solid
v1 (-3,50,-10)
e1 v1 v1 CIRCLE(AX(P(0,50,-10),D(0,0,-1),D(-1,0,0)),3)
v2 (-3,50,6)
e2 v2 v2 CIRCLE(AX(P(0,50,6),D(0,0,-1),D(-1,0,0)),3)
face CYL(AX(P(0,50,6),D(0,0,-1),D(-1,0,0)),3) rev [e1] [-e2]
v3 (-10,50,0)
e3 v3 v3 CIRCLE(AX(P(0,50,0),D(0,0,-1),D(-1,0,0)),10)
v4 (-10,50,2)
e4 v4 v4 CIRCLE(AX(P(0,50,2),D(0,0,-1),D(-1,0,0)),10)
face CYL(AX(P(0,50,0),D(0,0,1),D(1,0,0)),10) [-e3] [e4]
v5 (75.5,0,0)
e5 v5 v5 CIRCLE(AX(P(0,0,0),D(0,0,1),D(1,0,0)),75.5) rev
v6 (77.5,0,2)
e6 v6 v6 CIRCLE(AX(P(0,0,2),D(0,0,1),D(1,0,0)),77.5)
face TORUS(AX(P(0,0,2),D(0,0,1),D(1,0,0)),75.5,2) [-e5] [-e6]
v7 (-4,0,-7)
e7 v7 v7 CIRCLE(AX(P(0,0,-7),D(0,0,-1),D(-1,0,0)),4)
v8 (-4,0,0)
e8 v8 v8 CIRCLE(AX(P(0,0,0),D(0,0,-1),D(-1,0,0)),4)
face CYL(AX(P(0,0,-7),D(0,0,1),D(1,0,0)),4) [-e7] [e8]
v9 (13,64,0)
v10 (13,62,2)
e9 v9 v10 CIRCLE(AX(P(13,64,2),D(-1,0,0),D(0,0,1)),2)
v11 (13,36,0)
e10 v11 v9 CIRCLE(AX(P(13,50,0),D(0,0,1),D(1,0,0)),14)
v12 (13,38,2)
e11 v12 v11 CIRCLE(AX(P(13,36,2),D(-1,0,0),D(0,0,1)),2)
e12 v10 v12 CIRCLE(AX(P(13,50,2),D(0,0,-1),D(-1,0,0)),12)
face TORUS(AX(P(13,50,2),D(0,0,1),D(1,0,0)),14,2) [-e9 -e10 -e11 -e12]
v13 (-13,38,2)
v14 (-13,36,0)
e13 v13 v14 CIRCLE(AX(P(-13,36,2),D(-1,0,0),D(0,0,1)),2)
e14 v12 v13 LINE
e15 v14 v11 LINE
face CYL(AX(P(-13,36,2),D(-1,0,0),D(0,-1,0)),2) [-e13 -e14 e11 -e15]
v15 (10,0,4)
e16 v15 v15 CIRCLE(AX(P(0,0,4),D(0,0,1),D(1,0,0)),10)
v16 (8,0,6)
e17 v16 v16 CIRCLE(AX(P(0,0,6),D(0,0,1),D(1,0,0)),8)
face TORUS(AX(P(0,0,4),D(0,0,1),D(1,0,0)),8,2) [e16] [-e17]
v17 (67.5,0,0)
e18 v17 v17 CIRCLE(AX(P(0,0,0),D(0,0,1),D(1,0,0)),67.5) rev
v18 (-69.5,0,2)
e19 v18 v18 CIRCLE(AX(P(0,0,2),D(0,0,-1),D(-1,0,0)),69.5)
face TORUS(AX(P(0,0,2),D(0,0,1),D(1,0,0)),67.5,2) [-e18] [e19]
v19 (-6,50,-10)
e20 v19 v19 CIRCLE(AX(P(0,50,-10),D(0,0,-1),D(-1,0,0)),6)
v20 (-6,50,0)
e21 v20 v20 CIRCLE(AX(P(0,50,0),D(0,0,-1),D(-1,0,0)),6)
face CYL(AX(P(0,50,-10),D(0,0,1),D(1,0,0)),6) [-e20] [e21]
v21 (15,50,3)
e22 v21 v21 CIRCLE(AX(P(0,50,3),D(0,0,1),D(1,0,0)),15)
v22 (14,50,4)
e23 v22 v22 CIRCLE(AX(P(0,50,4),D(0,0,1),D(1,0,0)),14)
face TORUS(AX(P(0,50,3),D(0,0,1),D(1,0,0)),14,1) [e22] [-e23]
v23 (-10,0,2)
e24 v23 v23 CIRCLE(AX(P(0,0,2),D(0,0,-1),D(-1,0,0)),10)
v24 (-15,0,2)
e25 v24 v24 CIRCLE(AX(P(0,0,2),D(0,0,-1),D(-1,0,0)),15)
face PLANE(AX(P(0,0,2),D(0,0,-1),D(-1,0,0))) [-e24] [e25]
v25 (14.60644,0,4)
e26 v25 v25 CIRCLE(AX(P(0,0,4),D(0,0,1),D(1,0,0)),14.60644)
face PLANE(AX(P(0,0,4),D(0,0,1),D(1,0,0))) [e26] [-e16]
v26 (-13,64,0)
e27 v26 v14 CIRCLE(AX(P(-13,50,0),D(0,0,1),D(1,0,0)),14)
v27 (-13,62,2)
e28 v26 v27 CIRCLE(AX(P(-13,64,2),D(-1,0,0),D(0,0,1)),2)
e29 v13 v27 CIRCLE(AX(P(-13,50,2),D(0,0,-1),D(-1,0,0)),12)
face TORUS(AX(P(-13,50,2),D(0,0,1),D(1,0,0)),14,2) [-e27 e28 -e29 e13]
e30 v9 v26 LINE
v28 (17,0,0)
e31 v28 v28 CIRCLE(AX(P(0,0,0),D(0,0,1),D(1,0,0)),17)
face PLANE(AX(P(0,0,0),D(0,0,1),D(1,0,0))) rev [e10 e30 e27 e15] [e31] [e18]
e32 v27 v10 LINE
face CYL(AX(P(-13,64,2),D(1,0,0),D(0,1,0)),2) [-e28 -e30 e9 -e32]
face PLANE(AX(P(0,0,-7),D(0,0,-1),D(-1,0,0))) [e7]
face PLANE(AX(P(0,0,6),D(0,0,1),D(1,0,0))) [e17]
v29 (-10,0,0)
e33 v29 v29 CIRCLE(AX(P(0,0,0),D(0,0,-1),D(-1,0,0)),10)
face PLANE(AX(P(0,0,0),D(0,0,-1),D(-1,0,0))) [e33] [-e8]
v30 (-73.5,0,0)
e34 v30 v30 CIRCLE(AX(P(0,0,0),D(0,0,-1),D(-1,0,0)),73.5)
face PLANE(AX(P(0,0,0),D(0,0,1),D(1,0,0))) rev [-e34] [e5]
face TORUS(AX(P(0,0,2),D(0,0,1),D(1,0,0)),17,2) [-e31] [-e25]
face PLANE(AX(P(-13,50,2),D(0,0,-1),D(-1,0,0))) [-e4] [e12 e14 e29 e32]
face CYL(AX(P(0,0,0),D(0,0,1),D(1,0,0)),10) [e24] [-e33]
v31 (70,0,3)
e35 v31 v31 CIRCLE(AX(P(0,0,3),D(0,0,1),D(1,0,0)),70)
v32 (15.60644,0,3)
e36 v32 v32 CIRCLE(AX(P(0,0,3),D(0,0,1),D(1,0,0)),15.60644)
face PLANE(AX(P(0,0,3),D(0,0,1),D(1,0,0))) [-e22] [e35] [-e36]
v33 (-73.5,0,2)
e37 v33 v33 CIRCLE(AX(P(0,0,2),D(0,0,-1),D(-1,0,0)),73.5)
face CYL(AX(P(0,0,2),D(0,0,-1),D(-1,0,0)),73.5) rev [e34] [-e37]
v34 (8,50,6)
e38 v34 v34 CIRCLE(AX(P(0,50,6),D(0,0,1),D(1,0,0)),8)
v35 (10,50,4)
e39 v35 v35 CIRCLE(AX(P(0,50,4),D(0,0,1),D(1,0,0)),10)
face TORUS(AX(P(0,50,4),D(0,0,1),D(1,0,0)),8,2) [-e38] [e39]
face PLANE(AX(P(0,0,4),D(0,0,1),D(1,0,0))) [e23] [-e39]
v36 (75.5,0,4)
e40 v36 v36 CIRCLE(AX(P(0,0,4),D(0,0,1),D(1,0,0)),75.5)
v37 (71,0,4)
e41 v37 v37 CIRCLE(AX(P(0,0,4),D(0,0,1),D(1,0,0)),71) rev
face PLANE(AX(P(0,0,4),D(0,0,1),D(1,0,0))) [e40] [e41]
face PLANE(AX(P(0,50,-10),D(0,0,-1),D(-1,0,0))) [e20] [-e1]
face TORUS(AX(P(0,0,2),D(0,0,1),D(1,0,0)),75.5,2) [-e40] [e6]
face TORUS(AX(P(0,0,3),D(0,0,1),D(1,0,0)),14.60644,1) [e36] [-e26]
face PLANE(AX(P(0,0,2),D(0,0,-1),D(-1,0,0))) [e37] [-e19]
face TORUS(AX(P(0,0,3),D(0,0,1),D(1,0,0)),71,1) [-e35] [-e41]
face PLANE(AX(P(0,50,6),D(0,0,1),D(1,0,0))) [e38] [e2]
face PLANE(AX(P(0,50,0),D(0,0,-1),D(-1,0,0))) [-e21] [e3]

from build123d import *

# Parameters (mm, degrees)
SKETCH_3_R          = 77.5
EXTRUDE_1_DEPTH     = 4
FILLET_1_R          = 2
SKETCH_4_R          = 73.5
SKETCH_4_R_2        = 69.5
CUT_EXTRUDE_1_DEPTH = 2
FILLET_2_R          = 2
CUT_EXTRUDE_2_DEPTH = 2
SKETCH_7_R          = 10
EXTRUDE_2_DEPTH     = 2
SKETCH_8_R          = 6
EXTRUDE_3_DEPTH     = 10
EXTRUDE_START       = 2
SKETCH_9_R          = 10
EXTRUDE_4_DEPTH     = 2
SKETCH_10_R         = 3
CUT_EXTRUDE_3_DEPTH = 16
FILLET_3_R          = 2
FILLET_4_R          = 2
SKETCH_11_R         = 10
EXTRUDE_5_DEPTH     = 2
FILLET_5_R          = 2
SKETCH_12_R         = 70
SKETCH_12_R_2       = 15.606440373
SKETCH_12_R_3       = 15
CUT_EXTRUDE_4_DEPTH = 1
FILLET_6_R          = 1
SKETCH_13_R         = 15
CUT_EXTRUDE_5_DEPTH = 2
SKETCH_14_R         = 10
EXTRUDE_6_DEPTH     = 2
FILLET_7_R          = 2
SKETCH_15_R         = 4
EXTRUDE_7_DEPTH     = 7


with BuildPart() as part:
    # ｽｹｯﾁ3 → ﾎﾞｽ - 押し出し1 (new body)
    with BuildSketch(Plane.XY):
        Circle(SKETCH_3_R)
    extrude(amount=EXTRUDE_1_DEPTH)

    # ﾌｨﾚｯﾄ1
    fillet_1_edges = [part.edges().sort_by_distance(p)[0] for p in [
        (-77.5, 0, 0),
        (-77.5, 0, 4),
    ]]
    fillet(fillet_1_edges, radius=FILLET_1_R - 0.0001)  # a hair under: the kernel refuses the full size

    # ｽｹｯﾁ4 → ｶｯﾄ - 押し出し1 (cut)
    with BuildSketch(Plane(origin=(0, 0, 0), x_dir=(-1, 0, 0), z_dir=(0, 0, -1))):
        Circle(SKETCH_4_R)
        Circle(SKETCH_4_R_2, mode=Mode.SUBTRACT)
    extrude(amount=-CUT_EXTRUDE_1_DEPTH, mode=Mode.SUBTRACT)

    # ﾌｨﾚｯﾄ2
    fillet_2_edges = [part.edges().sort_by_distance(p)[0] for p in [
        (69.5, 0, 0),
    ]]
    fillet(fillet_2_edges, radius=FILLET_2_R - 0.0001)  # a hair under: the kernel refuses the full size

    # ｽｹｯﾁ6 → ｶｯﾄ - 押し出し2 (cut)
    with BuildSketch(Plane(origin=(0, 0, 0), x_dir=(-1, 0, 0), z_dir=(0, 0, -1))):
        with BuildLine():
            Line((13, 38), (-13, 38))
            ThreePointArc((-13, 38), (-25, 50), (-13, 62))
            Line((-13, 62), (13, 62))
            ThreePointArc((13, 62), (25, 50), (13, 38))
        make_face()
    extrude(amount=-CUT_EXTRUDE_2_DEPTH, mode=Mode.SUBTRACT)

    # ｽｹｯﾁ7 → ﾎﾞｽ - 押し出し2 (add)
    with BuildSketch(Plane(origin=(0, 0, 2), x_dir=(-1, 0, 0), z_dir=(0, 0, -1))):
        with Locations((0, 50)):
            Circle(SKETCH_7_R)
    extrude(amount=EXTRUDE_2_DEPTH)

    # ｽｹｯﾁ8 → ﾎﾞｽ - 押し出し3 (add)
    with BuildSketch(Plane(origin=(0, 0, 0), x_dir=(-1, 0, 0), z_dir=(0, 0, -1))):
        with Locations((0, 50)):
            Circle(SKETCH_8_R)
    extrude(amount=EXTRUDE_3_DEPTH)

    # ｽｹｯﾁ9 → ﾎﾞｽ - 押し出し4 (add)
    with BuildSketch(Plane.XY.offset(4).offset(EXTRUDE_START)):
        with Locations(Location((0, 50, 0), (0, 0, 180))):
            Circle(SKETCH_9_R)
    extrude(amount=-EXTRUDE_4_DEPTH)

    # ｽｹｯﾁ10 → ｶｯﾄ - 押し出し3 (cut)
    with BuildSketch(Plane(origin=(0, 0, -10), x_dir=(-1, 0, 0), z_dir=(0, 0, -1))):
        with Locations((0, 50)):
            Circle(SKETCH_10_R)
    extrude(amount=-CUT_EXTRUDE_3_DEPTH, mode=Mode.SUBTRACT)

    # ﾌｨﾚｯﾄ3
    fillet_3_edges = [part.edges().sort_by_distance(p)[0] for p in [
        (10, 50, 6),
    ]]
    fillet(fillet_3_edges, radius=FILLET_3_R - 0.0001)  # a hair under: the kernel refuses the full size

    # ﾌｨﾚｯﾄ4
    fillet_4_edges = [part.edges().sort_by_distance(p)[0] for p in [
        (-25, 50, 0),
        (0, 62, 0),
        (0, 38, 0),
        (25, 50, 0),
    ]]
    fillet(fillet_4_edges, radius=FILLET_4_R - 0.0001)  # a hair under: the kernel refuses the full size

    # ｽｹｯﾁ11 → ﾎﾞｽ - 押し出し5 (add)
    with BuildSketch(Plane.XY.offset(4)):
        Circle(SKETCH_11_R)
    extrude(amount=EXTRUDE_5_DEPTH)

    # ﾌｨﾚｯﾄ5
    fillet_5_edges = [part.edges().sort_by_distance(p)[0] for p in [
        (-10, 0, 6),
    ]]
    fillet(fillet_5_edges, radius=FILLET_5_R - 0.0001)  # a hair under: the kernel refuses the full size

    # ｽｹｯﾁ12 → ｶｯﾄ - 押し出し4 (cut)
    with BuildSketch(Plane.XY.offset(4)):
        Circle(SKETCH_12_R)
        Circle(SKETCH_12_R_2, mode=Mode.SUBTRACT)
        with Locations((0, 50)):
            Circle(SKETCH_12_R_3, mode=Mode.SUBTRACT)
    extrude(amount=-CUT_EXTRUDE_4_DEPTH, mode=Mode.SUBTRACT)

    # ﾌｨﾚｯﾄ6
    fillet_6_edges = [part.edges().sort_by_distance(p)[0] for p in [
        (-70, 0, 4),
        (-15.606440373, 0, 4),
        (-15, 50, 4),
    ]]
    fillet(fillet_6_edges, radius=FILLET_6_R - 0.0001)  # a hair under: the kernel refuses the full size

    # ｽｹｯﾁ13 → ｶｯﾄ - 押し出し5 (cut)
    with BuildSketch(Plane(origin=(0, 0, 0), x_dir=(-1, 0, 0), z_dir=(0, 0, -1))):
        Circle(SKETCH_13_R)
    extrude(amount=-CUT_EXTRUDE_5_DEPTH, mode=Mode.SUBTRACT)

    # ｽｹｯﾁ14 → ﾎﾞｽ - 押し出し6 (add)
    with BuildSketch(Plane(origin=(0, 0, 2), x_dir=(-1, 0, 0), z_dir=(0, 0, -1)).offset(EXTRUDE_START)):
        Circle(SKETCH_14_R)
    extrude(amount=-EXTRUDE_6_DEPTH)

    # ﾌｨﾚｯﾄ7
    fillet_7_edges = [part.edges().sort_by_distance(p)[0] for p in [
        (15, 0, 0),
    ]]
    fillet(fillet_7_edges, radius=FILLET_7_R - 0.0001)  # a hair under: the kernel refuses the full size

    # ｽｹｯﾁ15 → ﾎﾞｽ - 押し出し7 (add)
    with BuildSketch(Plane(origin=(0, 0, 0), x_dir=(-1, 0, 0), z_dir=(0, 0, -1))):
        Circle(SKETCH_15_R)
    extrude(amount=EXTRUDE_7_DEPTH)


solid = part.part
